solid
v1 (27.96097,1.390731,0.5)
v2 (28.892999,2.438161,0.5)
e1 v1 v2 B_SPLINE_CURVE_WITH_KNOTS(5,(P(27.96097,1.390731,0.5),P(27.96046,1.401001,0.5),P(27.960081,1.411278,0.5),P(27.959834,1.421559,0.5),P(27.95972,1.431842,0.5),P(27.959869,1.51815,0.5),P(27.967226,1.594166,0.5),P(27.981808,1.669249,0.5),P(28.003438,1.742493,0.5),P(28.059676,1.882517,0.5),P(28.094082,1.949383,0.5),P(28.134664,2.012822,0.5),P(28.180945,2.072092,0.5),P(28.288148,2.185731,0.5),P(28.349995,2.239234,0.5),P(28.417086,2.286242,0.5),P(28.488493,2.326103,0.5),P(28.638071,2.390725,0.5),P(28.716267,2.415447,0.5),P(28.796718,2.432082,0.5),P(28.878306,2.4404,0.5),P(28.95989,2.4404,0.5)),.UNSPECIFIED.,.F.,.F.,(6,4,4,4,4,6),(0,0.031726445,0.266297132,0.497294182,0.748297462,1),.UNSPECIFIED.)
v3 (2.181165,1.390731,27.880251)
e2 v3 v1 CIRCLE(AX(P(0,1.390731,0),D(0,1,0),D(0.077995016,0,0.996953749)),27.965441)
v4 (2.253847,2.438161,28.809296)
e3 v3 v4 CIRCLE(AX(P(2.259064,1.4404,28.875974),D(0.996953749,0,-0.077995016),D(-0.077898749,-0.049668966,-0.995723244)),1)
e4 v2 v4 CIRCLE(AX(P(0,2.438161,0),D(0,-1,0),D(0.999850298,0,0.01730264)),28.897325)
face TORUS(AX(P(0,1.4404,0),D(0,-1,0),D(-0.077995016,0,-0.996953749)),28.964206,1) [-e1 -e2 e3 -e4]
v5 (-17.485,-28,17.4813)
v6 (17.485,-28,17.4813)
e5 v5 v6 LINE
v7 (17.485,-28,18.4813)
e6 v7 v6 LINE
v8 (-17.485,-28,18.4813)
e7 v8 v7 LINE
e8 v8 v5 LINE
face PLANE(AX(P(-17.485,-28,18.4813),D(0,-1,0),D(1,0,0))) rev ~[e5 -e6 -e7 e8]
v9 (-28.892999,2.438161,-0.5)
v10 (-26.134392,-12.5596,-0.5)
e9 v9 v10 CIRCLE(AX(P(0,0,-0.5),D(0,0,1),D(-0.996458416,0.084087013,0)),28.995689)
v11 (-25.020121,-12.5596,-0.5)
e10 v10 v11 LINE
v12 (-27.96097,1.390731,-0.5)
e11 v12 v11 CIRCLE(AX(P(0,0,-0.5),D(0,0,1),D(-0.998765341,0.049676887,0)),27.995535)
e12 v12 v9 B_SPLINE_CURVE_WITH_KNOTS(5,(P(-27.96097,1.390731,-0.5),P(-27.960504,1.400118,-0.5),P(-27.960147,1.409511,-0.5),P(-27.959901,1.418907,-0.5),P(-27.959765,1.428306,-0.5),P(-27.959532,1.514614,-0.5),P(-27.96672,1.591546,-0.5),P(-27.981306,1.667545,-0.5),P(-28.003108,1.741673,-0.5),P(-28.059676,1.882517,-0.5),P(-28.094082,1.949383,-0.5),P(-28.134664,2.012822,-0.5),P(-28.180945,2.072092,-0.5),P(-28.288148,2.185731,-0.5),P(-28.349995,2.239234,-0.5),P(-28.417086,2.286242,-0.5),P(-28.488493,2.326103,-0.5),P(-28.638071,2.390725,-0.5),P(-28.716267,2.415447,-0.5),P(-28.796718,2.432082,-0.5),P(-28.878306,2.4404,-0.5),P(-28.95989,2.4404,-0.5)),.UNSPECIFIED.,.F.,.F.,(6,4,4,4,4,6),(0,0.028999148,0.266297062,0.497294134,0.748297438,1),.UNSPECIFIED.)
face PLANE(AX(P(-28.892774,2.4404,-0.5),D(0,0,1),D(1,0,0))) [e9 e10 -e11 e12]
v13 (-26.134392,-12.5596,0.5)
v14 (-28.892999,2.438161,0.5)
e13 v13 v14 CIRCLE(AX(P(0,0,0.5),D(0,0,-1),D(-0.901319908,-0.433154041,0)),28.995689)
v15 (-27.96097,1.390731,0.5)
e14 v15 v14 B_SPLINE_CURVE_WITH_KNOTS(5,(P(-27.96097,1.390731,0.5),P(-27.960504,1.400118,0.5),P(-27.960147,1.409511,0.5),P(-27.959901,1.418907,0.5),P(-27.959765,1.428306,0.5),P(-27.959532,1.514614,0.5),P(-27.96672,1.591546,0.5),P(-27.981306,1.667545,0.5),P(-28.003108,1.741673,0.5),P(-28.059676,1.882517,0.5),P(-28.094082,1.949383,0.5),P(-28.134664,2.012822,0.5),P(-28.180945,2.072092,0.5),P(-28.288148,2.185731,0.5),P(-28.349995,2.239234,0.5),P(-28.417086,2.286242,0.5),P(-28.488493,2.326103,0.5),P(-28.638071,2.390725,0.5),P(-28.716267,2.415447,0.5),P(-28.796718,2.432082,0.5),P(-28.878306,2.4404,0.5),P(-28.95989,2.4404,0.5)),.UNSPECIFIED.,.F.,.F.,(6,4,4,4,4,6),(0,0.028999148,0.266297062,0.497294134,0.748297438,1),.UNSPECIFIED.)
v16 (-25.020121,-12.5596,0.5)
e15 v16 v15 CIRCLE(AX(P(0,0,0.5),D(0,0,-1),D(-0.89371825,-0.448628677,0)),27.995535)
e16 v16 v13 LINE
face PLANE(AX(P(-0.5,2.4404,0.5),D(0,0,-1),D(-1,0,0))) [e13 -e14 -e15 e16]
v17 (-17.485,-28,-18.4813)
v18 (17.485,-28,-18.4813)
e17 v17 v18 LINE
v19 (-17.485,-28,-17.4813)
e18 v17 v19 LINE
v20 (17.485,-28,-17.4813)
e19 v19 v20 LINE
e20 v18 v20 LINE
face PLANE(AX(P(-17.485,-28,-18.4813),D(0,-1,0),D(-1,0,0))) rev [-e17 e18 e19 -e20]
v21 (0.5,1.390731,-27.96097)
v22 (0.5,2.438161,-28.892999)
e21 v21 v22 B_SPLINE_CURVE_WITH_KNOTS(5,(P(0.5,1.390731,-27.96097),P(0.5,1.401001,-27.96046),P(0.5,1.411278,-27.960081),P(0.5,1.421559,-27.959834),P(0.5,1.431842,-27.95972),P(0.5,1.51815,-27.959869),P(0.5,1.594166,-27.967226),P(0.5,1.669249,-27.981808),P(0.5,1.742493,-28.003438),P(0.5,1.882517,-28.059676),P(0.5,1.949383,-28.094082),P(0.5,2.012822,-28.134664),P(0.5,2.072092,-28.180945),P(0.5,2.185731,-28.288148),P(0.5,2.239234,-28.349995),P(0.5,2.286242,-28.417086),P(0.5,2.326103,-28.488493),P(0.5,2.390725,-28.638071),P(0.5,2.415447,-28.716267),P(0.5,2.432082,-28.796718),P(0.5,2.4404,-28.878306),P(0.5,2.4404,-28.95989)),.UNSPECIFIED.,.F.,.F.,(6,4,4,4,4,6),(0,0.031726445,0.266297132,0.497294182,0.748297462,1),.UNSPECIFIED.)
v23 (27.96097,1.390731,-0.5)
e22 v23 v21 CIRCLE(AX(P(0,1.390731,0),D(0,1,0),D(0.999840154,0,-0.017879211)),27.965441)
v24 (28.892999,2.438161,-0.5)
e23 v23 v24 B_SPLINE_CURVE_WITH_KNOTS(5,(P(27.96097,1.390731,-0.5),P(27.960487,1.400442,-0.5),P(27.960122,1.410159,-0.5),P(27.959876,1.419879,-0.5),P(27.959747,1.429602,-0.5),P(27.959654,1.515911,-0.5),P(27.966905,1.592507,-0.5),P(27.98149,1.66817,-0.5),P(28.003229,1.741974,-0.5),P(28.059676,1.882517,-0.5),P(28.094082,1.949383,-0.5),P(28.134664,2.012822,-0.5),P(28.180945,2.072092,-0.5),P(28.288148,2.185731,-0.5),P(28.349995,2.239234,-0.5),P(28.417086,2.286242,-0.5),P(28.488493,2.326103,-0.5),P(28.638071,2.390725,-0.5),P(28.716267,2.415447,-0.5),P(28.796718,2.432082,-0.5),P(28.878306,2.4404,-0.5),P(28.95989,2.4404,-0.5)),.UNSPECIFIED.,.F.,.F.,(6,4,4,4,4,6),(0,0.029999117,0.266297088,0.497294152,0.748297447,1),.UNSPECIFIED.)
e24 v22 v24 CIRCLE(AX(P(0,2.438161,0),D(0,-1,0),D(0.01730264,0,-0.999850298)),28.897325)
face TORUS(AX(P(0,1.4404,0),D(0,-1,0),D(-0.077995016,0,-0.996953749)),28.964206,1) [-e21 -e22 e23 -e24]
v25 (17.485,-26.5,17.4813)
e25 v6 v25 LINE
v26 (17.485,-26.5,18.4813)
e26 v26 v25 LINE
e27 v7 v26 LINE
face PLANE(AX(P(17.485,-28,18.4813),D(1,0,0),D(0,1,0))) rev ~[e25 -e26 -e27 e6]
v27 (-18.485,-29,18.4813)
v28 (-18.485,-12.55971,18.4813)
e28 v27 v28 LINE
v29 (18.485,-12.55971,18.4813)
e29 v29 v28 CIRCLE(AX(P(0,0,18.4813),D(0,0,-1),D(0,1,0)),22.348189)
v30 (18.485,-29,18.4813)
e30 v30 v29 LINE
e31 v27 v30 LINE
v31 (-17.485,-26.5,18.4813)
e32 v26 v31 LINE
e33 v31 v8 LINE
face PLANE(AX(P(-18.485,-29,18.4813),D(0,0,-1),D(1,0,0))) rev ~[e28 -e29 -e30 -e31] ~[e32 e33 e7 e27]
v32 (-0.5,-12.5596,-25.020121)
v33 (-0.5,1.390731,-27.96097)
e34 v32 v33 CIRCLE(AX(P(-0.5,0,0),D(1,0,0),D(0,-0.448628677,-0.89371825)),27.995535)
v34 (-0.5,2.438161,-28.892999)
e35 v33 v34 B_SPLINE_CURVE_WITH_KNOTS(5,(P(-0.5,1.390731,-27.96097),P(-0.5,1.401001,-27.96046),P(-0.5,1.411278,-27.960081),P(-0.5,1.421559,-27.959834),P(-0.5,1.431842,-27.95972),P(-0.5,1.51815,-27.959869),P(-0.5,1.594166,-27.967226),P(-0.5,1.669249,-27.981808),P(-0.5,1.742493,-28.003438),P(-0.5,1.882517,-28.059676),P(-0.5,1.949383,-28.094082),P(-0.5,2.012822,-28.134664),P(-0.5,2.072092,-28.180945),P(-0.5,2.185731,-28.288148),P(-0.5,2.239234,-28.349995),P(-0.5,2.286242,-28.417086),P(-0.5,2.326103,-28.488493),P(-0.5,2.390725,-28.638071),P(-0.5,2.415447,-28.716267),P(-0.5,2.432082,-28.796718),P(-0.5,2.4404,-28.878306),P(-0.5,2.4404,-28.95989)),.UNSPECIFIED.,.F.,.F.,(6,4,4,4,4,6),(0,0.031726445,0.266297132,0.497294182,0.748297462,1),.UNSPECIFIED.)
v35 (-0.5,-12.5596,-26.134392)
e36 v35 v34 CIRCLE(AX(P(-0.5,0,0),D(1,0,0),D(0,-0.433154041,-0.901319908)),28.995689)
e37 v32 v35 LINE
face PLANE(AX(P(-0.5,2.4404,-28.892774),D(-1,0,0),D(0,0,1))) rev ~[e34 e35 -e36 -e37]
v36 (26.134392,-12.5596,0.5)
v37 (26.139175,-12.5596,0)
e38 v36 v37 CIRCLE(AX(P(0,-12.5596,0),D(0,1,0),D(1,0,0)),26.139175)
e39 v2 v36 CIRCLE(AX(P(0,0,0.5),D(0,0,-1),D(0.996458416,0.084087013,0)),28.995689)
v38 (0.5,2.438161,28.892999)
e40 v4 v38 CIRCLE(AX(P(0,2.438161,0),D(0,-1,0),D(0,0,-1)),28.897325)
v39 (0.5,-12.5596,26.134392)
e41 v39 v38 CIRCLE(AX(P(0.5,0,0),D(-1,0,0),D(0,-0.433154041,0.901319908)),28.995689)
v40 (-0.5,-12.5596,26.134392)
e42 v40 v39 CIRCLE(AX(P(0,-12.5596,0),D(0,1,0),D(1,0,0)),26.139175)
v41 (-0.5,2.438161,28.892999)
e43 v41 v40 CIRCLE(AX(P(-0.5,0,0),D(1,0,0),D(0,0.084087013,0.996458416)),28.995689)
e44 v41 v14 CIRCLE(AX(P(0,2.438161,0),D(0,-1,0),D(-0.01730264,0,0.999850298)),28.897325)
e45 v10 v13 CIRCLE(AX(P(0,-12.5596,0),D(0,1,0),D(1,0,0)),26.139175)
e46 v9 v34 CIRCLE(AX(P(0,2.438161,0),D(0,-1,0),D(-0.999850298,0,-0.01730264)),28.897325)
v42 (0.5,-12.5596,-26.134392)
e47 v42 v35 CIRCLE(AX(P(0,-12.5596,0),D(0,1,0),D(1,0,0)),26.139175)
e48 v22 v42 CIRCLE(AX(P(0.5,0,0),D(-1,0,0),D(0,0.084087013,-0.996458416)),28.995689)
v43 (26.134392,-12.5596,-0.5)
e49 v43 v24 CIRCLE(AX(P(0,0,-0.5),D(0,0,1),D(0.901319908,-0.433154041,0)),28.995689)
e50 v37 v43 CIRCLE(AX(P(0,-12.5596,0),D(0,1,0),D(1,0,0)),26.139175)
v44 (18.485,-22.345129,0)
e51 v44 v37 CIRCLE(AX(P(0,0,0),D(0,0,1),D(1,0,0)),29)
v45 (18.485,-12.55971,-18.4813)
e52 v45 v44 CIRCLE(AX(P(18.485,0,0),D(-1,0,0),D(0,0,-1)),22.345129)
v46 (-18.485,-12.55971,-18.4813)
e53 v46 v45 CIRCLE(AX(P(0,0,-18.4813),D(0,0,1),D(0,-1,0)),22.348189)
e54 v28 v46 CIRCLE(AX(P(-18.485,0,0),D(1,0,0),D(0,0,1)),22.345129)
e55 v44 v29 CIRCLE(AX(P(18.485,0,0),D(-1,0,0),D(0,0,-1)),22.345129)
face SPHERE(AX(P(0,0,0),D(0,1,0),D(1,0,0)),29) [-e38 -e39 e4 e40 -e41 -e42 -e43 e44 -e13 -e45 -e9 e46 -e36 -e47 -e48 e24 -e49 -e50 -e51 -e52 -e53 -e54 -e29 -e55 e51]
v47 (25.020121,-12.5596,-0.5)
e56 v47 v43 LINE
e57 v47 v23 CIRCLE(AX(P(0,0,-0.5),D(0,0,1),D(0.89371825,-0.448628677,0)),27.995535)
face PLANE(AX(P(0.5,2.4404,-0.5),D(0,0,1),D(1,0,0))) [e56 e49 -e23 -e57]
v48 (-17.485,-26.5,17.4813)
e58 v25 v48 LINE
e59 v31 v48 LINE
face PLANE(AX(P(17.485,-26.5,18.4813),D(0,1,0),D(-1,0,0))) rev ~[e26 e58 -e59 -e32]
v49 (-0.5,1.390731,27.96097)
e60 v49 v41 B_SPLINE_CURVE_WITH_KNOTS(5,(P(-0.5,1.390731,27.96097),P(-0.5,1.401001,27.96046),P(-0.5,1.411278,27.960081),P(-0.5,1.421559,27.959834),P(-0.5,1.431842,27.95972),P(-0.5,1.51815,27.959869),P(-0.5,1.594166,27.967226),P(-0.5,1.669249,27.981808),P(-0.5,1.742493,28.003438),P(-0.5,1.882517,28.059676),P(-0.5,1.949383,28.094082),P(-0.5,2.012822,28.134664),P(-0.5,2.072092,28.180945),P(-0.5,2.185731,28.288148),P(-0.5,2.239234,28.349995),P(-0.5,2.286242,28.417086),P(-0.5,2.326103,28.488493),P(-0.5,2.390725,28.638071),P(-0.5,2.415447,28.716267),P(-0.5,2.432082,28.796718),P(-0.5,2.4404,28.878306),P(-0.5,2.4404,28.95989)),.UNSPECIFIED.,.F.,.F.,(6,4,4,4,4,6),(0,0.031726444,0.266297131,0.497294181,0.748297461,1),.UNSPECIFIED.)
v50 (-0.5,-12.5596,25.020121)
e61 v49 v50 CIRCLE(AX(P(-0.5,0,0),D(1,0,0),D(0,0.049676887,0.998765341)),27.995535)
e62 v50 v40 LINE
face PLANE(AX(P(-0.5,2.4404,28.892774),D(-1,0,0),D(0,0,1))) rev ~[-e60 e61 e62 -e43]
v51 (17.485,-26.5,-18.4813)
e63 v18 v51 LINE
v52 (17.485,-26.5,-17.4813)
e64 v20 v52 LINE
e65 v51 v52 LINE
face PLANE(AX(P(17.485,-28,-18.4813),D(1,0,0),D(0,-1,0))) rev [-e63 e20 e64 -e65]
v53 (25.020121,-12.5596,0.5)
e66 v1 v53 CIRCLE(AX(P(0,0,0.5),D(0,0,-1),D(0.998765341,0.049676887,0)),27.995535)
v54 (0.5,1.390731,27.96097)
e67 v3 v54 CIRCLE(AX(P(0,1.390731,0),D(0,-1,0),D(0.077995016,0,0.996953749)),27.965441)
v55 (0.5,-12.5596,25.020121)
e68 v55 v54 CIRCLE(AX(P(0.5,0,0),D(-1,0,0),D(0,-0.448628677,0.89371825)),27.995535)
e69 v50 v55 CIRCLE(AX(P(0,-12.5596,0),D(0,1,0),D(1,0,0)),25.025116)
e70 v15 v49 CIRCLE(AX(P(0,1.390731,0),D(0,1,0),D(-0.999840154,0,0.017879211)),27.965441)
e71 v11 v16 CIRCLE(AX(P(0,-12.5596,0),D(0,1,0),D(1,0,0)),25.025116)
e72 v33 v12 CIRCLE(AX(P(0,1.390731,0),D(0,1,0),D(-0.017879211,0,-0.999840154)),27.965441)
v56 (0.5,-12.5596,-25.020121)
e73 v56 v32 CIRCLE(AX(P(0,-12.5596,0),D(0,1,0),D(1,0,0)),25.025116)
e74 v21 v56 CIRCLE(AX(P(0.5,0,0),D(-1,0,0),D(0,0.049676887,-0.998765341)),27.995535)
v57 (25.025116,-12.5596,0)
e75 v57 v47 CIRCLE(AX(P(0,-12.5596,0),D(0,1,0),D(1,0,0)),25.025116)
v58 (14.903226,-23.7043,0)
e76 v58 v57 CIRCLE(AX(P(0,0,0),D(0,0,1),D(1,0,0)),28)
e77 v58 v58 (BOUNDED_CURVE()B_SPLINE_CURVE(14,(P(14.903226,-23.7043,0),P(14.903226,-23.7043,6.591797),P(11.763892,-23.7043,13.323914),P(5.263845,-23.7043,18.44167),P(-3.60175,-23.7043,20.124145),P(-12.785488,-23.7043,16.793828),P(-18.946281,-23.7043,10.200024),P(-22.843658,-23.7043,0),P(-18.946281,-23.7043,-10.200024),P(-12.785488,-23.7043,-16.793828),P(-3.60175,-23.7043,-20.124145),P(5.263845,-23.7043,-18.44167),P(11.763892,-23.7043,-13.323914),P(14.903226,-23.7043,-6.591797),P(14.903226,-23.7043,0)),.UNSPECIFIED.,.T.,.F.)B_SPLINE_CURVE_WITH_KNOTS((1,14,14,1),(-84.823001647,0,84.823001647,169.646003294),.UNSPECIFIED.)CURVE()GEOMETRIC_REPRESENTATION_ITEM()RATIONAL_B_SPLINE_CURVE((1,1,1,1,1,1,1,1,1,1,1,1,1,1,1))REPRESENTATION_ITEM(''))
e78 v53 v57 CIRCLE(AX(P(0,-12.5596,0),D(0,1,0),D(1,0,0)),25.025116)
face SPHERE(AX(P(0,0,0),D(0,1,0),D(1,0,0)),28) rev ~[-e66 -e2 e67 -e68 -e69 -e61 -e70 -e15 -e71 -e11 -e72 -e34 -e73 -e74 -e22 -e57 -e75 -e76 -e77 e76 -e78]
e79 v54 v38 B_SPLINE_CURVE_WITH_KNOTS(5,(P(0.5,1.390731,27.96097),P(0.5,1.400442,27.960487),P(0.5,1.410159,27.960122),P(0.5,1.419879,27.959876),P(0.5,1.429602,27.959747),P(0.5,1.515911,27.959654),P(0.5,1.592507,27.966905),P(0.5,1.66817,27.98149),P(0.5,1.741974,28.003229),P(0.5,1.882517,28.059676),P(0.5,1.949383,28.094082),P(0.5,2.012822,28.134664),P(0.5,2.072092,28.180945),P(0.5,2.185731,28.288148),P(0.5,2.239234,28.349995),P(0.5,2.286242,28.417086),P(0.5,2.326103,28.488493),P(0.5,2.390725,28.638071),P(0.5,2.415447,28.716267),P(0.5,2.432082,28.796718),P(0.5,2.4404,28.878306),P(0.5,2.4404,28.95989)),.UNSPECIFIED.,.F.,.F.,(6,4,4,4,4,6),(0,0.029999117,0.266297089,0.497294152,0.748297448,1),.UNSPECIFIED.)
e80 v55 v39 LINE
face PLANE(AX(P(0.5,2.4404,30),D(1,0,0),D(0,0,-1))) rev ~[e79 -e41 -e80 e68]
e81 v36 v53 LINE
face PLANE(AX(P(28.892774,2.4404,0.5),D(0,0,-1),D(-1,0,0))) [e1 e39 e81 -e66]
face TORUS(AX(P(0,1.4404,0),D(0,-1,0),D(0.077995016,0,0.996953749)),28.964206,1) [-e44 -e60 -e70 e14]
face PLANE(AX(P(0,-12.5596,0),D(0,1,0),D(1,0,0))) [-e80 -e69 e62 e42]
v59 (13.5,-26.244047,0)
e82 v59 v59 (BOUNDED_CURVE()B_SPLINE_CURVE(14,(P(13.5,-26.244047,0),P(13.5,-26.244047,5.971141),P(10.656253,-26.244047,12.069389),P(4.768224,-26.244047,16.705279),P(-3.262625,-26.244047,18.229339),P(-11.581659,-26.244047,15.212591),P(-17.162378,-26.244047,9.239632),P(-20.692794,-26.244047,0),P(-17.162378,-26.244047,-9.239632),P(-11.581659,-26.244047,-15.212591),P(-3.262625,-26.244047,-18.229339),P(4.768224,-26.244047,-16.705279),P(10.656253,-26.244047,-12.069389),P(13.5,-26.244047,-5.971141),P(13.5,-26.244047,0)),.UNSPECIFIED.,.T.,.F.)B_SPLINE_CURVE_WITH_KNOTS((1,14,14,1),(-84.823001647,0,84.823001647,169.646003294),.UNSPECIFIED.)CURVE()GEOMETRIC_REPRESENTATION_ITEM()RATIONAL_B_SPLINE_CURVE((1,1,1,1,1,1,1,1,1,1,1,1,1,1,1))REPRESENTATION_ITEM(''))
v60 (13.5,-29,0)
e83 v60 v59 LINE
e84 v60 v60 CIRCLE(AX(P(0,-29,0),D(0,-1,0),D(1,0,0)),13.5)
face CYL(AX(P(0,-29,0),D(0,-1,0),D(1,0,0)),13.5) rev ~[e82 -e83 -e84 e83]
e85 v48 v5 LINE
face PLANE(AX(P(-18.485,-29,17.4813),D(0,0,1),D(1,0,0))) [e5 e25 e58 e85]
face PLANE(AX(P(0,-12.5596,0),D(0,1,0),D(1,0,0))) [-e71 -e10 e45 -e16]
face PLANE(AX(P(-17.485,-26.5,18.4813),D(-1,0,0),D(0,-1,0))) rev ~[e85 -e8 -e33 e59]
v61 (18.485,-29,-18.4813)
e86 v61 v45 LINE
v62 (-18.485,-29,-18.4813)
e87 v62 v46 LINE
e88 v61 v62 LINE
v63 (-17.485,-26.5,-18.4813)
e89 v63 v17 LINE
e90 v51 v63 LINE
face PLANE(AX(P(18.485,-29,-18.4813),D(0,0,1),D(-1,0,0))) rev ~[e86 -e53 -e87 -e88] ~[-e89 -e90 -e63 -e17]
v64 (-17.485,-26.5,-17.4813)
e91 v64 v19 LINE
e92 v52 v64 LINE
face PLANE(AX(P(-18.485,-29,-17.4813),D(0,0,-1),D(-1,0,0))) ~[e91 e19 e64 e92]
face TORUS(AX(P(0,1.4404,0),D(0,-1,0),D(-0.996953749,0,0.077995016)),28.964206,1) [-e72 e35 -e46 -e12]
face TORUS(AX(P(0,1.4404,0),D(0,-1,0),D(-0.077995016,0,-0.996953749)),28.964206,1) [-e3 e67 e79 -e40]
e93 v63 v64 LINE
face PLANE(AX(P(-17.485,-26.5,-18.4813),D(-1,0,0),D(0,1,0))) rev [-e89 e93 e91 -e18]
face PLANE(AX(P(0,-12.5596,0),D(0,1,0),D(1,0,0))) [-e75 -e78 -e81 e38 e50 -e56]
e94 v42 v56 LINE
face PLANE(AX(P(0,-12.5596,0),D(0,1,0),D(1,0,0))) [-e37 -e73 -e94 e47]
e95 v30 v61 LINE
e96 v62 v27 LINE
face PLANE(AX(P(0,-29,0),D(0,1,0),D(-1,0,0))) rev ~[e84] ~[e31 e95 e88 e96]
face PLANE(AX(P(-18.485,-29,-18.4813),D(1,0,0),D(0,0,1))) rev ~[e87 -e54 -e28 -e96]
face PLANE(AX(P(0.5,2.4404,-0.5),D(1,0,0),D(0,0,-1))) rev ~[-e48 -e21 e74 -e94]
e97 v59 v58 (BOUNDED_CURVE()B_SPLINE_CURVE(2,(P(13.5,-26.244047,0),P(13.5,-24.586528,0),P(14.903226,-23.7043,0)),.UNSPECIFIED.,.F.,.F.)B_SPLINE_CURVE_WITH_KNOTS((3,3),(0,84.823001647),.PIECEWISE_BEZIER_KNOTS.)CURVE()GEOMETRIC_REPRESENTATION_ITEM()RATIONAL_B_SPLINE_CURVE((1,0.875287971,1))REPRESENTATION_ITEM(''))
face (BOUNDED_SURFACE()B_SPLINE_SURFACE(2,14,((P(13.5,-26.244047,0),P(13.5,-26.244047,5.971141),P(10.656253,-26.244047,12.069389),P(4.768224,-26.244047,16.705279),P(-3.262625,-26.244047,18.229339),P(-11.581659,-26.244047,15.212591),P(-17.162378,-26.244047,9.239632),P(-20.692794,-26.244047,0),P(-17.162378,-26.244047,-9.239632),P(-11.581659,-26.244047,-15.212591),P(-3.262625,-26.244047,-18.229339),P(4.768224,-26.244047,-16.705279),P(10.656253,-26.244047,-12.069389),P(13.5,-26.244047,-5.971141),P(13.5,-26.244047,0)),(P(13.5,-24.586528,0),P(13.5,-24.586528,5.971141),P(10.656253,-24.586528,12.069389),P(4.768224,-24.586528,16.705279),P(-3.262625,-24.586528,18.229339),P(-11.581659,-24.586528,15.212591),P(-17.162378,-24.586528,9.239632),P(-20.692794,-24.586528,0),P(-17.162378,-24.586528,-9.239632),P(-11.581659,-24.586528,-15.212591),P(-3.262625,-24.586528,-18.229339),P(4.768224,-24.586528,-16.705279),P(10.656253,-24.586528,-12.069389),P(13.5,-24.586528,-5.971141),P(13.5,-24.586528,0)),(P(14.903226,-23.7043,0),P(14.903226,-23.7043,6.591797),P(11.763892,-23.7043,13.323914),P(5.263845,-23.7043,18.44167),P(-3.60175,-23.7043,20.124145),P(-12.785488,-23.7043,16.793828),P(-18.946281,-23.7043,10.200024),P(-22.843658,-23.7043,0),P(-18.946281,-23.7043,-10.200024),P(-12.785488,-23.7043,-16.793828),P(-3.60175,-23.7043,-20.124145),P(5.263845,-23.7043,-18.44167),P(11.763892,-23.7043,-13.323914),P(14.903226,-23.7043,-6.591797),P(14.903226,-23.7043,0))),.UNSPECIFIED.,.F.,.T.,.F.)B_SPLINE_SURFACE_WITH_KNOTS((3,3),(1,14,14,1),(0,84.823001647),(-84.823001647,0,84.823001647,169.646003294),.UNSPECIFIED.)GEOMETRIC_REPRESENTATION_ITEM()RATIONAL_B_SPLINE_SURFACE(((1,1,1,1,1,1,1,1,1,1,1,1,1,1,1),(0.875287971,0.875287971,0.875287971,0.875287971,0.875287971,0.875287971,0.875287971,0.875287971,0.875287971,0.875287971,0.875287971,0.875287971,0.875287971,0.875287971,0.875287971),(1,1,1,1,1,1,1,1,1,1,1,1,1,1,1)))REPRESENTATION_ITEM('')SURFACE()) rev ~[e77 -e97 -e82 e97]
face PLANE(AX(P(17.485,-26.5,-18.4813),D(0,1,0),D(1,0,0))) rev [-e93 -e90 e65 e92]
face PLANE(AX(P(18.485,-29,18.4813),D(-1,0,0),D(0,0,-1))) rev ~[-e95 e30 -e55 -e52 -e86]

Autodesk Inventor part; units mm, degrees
ref_plane "YZ Plane" through (0, 0, 0) normal (1, 0, 0) x (0, 1, 0)
sketch "Sketch1" plane through (0, 0, 0) normal (0, 0, 1) x (1, 0, 0)
  circle A0 centre (0, 0) radius 28 construction
  circle A1 centre (0, 0) radius 29 construction
  circle A2 centre (0, 0) radius 28
  circle A3 centre (0, 0) radius 29
  line L0 (0, 0) -> (27.8935, 2.4404)
  line L1 (0, 0) -> (28, 0) construction
  line L2 (0, 0) -> (0, -29.5121)
  line L3 (0, -28) -> (0, -29)
  line L4 (27.8935, 2.4404) -> (28.8971, 2.4404)
  dimension "d0" = 56
  dimension "d1" = 58
  dimension "d2" = 5
revolve "Revolution1" add sketch "Sketch1" angle 360 about axis through (0, 0, 0) along (0, -1, 0) picked at (16.0405, -23.5642) contours A2 L4 A3 L2
sketch "Sketch2" plane through (0, 2.4404, 0) normal (0, 1, 0) x (1, 0, 0)
  line L0 (-0.5, -30) -> (0.5, -30)
  line L1 (0.5, -30) -> (0.5, 30)
  line L2 (0.5, 30) -> (-0.5, 30)
  line L3 (-0.5, 30) -> (-0.5, -30)
  line L4 (-0.5, -30) -> (0.5, 30) construction
  line L5 (0.5, -30) -> (-0.5, 30) construction
  line L6 (30, -0.5) -> (-30, -0.5)
  line L7 (-30, -0.5) -> (-30, 0.5)
  line L8 (-30, 0.5) -> (30, 0.5)
  line L9 (30, 0.5) -> (30, -0.5)
  circle A0 centre (0, 0) radius 28.8971 projected
  line L10 (30, -0.5) -> (-30, 0.5) construction
  line L11 (-30, -0.5) -> (30, 0.5) construction
  point P0 (0.5, 0.5)
  point P1 (-0.5, 0.5)
  point P2 (-0.5, -0.5)
  point P3 (0.5, -0.5)
  dimension "d4" = 1
  dimension "d5" = 60
  dimension "d6" = 60
  dimension "d7" = 1
extrude "Extrusion1" cut sketch "Sketch2" against normal blind 15 contours L3 A0 L1 L0 | L3 L6 L1 A0 | L6 A0 L8 L3 | L3 L8 L1 L6 | L6 L7 L8 A0 | L1 L8 A0 L6 | A0 L8 L9 L6 | L3 A0 L1 L8 | L3 L2 L1 A0
ref_plane "Work Plane1" through (0, -29, 0) normal (0, 1, 0) x (-1, 0, 0)
sketch "Sketch3" plane through (0, -29, 0) normal (0, 1, 0) x (-1, 0, 0)
  arc A0 (-0.5, 28.8928) -> (-28.8928, 0.5) centre (0, 0) ccw projected
  arc A1 (-0.5, -26.1344) -> (0.5, -26.1344) centre (0, 0) ccw projected
  line L0 (0.5, -25.0201) -> (0.5, -26.1344) projected
  arc A2 (-0.5, -25.0201) -> (0.5, -25.0201) centre (0, 0) ccw projected
  line L1 (-0.5, -26.1344) -> (-0.5, -25.0201) projected
  circle A3 centre (0, 0) radius 26.1392
  line L2 (18.485, 18.4813) -> (-18.485, 18.4813)
  line L3 (-18.485, 18.4813) -> (-18.485, -18.4813)
  line L4 (-18.485, -18.4813) -> (18.485, -18.4813)
  line L5 (18.485, -18.4813) -> (18.485, 18.4813)
  line L6 (18.485, 18.4813) -> (-18.485, -18.4813) construction
  line L7 (-18.485, 18.4813) -> (18.485, -18.4813) construction
  dimension "d11" = 36.97
extrude "Extrusion2" add sketch "Sketch3" along normal up to surface contours L3 L2 L5 L4
sketch "Sketch4" plane through (0, -29, 0) normal (0, -1, 0) x (1, 0, 0)
  circle A0 centre (0, 0) radius 13.5
  dimension "d14" = 27
extrude "Extrusion3" cut sketch "Sketch4" against normal blind 10
fillet "Fillet1" radius 3 1 edges at (-13.5, -24.5306, 0)
fillet "Fillet2" radius 1 4 edges at (-19.7236, 2.4404, 19.7236) (-19.7236, 2.4404, -19.7236) (19.7236, 2.4404, -19.7236) (19.7236, 2.4404, 19.7236)
sketch "Sketch5" plane through (-18.485, -29, 18.4813) normal (0, 0, 1) x (1, 0, 0)
  line L0 (0, 0) -> (0, 16.4404) construction
  line L1 (0, 0) -> (1, 0) construction
  line L2 (1, 0) -> (1, 1) construction
  line L3 (1, 1) -> (0, 1) construction
  line L4 (0, 1) -> (0, 0) construction
  arc A0 (0, 16.4404) -> (36.97, 16.4404) centre (18.485, 29) ccw construction
  line L5 (0, 0) -> (0, 16.4404) construction
  line L6 (0, 0) -> (36.97, 0) construction
  line L7 (36.97, 0) -> (36.97, 16.4404) construction
  line L8 (1, 1) -> (35.97, 1) construction
  line L9 (35.97, 1) -> (35.97, 2.5) construction
  line L10 (35.97, 2.5) -> (1, 2.5) construction
  line L11 (1, 2.5) -> (1, 1) construction
  line L12 (1, 1) -> (35.97, 1)
  line L13 (35.97, 1) -> (35.97, 2.5)
  line L14 (35.97, 2.5) -> (1, 2.5)
  line L15 (1, 2.5) -> (1, 1)
  dimension "d19" = 1
  dimension "d20" = 1
  dimension "d21" = 34.97
  dimension "d22" = 1.5
extrude "Extrusion4" cut sketch "Sketch5" against normal blind 1
ref_plane "Work Plane2" through (-18.485, -29, 0) normal (0, 0, 1) x (1, 0, 0)
mirror "Mirror1" about plane through (-18.485, -29, 0) normal (0, 0, 1) of "Extrusion4"
properties part number "Socket"
